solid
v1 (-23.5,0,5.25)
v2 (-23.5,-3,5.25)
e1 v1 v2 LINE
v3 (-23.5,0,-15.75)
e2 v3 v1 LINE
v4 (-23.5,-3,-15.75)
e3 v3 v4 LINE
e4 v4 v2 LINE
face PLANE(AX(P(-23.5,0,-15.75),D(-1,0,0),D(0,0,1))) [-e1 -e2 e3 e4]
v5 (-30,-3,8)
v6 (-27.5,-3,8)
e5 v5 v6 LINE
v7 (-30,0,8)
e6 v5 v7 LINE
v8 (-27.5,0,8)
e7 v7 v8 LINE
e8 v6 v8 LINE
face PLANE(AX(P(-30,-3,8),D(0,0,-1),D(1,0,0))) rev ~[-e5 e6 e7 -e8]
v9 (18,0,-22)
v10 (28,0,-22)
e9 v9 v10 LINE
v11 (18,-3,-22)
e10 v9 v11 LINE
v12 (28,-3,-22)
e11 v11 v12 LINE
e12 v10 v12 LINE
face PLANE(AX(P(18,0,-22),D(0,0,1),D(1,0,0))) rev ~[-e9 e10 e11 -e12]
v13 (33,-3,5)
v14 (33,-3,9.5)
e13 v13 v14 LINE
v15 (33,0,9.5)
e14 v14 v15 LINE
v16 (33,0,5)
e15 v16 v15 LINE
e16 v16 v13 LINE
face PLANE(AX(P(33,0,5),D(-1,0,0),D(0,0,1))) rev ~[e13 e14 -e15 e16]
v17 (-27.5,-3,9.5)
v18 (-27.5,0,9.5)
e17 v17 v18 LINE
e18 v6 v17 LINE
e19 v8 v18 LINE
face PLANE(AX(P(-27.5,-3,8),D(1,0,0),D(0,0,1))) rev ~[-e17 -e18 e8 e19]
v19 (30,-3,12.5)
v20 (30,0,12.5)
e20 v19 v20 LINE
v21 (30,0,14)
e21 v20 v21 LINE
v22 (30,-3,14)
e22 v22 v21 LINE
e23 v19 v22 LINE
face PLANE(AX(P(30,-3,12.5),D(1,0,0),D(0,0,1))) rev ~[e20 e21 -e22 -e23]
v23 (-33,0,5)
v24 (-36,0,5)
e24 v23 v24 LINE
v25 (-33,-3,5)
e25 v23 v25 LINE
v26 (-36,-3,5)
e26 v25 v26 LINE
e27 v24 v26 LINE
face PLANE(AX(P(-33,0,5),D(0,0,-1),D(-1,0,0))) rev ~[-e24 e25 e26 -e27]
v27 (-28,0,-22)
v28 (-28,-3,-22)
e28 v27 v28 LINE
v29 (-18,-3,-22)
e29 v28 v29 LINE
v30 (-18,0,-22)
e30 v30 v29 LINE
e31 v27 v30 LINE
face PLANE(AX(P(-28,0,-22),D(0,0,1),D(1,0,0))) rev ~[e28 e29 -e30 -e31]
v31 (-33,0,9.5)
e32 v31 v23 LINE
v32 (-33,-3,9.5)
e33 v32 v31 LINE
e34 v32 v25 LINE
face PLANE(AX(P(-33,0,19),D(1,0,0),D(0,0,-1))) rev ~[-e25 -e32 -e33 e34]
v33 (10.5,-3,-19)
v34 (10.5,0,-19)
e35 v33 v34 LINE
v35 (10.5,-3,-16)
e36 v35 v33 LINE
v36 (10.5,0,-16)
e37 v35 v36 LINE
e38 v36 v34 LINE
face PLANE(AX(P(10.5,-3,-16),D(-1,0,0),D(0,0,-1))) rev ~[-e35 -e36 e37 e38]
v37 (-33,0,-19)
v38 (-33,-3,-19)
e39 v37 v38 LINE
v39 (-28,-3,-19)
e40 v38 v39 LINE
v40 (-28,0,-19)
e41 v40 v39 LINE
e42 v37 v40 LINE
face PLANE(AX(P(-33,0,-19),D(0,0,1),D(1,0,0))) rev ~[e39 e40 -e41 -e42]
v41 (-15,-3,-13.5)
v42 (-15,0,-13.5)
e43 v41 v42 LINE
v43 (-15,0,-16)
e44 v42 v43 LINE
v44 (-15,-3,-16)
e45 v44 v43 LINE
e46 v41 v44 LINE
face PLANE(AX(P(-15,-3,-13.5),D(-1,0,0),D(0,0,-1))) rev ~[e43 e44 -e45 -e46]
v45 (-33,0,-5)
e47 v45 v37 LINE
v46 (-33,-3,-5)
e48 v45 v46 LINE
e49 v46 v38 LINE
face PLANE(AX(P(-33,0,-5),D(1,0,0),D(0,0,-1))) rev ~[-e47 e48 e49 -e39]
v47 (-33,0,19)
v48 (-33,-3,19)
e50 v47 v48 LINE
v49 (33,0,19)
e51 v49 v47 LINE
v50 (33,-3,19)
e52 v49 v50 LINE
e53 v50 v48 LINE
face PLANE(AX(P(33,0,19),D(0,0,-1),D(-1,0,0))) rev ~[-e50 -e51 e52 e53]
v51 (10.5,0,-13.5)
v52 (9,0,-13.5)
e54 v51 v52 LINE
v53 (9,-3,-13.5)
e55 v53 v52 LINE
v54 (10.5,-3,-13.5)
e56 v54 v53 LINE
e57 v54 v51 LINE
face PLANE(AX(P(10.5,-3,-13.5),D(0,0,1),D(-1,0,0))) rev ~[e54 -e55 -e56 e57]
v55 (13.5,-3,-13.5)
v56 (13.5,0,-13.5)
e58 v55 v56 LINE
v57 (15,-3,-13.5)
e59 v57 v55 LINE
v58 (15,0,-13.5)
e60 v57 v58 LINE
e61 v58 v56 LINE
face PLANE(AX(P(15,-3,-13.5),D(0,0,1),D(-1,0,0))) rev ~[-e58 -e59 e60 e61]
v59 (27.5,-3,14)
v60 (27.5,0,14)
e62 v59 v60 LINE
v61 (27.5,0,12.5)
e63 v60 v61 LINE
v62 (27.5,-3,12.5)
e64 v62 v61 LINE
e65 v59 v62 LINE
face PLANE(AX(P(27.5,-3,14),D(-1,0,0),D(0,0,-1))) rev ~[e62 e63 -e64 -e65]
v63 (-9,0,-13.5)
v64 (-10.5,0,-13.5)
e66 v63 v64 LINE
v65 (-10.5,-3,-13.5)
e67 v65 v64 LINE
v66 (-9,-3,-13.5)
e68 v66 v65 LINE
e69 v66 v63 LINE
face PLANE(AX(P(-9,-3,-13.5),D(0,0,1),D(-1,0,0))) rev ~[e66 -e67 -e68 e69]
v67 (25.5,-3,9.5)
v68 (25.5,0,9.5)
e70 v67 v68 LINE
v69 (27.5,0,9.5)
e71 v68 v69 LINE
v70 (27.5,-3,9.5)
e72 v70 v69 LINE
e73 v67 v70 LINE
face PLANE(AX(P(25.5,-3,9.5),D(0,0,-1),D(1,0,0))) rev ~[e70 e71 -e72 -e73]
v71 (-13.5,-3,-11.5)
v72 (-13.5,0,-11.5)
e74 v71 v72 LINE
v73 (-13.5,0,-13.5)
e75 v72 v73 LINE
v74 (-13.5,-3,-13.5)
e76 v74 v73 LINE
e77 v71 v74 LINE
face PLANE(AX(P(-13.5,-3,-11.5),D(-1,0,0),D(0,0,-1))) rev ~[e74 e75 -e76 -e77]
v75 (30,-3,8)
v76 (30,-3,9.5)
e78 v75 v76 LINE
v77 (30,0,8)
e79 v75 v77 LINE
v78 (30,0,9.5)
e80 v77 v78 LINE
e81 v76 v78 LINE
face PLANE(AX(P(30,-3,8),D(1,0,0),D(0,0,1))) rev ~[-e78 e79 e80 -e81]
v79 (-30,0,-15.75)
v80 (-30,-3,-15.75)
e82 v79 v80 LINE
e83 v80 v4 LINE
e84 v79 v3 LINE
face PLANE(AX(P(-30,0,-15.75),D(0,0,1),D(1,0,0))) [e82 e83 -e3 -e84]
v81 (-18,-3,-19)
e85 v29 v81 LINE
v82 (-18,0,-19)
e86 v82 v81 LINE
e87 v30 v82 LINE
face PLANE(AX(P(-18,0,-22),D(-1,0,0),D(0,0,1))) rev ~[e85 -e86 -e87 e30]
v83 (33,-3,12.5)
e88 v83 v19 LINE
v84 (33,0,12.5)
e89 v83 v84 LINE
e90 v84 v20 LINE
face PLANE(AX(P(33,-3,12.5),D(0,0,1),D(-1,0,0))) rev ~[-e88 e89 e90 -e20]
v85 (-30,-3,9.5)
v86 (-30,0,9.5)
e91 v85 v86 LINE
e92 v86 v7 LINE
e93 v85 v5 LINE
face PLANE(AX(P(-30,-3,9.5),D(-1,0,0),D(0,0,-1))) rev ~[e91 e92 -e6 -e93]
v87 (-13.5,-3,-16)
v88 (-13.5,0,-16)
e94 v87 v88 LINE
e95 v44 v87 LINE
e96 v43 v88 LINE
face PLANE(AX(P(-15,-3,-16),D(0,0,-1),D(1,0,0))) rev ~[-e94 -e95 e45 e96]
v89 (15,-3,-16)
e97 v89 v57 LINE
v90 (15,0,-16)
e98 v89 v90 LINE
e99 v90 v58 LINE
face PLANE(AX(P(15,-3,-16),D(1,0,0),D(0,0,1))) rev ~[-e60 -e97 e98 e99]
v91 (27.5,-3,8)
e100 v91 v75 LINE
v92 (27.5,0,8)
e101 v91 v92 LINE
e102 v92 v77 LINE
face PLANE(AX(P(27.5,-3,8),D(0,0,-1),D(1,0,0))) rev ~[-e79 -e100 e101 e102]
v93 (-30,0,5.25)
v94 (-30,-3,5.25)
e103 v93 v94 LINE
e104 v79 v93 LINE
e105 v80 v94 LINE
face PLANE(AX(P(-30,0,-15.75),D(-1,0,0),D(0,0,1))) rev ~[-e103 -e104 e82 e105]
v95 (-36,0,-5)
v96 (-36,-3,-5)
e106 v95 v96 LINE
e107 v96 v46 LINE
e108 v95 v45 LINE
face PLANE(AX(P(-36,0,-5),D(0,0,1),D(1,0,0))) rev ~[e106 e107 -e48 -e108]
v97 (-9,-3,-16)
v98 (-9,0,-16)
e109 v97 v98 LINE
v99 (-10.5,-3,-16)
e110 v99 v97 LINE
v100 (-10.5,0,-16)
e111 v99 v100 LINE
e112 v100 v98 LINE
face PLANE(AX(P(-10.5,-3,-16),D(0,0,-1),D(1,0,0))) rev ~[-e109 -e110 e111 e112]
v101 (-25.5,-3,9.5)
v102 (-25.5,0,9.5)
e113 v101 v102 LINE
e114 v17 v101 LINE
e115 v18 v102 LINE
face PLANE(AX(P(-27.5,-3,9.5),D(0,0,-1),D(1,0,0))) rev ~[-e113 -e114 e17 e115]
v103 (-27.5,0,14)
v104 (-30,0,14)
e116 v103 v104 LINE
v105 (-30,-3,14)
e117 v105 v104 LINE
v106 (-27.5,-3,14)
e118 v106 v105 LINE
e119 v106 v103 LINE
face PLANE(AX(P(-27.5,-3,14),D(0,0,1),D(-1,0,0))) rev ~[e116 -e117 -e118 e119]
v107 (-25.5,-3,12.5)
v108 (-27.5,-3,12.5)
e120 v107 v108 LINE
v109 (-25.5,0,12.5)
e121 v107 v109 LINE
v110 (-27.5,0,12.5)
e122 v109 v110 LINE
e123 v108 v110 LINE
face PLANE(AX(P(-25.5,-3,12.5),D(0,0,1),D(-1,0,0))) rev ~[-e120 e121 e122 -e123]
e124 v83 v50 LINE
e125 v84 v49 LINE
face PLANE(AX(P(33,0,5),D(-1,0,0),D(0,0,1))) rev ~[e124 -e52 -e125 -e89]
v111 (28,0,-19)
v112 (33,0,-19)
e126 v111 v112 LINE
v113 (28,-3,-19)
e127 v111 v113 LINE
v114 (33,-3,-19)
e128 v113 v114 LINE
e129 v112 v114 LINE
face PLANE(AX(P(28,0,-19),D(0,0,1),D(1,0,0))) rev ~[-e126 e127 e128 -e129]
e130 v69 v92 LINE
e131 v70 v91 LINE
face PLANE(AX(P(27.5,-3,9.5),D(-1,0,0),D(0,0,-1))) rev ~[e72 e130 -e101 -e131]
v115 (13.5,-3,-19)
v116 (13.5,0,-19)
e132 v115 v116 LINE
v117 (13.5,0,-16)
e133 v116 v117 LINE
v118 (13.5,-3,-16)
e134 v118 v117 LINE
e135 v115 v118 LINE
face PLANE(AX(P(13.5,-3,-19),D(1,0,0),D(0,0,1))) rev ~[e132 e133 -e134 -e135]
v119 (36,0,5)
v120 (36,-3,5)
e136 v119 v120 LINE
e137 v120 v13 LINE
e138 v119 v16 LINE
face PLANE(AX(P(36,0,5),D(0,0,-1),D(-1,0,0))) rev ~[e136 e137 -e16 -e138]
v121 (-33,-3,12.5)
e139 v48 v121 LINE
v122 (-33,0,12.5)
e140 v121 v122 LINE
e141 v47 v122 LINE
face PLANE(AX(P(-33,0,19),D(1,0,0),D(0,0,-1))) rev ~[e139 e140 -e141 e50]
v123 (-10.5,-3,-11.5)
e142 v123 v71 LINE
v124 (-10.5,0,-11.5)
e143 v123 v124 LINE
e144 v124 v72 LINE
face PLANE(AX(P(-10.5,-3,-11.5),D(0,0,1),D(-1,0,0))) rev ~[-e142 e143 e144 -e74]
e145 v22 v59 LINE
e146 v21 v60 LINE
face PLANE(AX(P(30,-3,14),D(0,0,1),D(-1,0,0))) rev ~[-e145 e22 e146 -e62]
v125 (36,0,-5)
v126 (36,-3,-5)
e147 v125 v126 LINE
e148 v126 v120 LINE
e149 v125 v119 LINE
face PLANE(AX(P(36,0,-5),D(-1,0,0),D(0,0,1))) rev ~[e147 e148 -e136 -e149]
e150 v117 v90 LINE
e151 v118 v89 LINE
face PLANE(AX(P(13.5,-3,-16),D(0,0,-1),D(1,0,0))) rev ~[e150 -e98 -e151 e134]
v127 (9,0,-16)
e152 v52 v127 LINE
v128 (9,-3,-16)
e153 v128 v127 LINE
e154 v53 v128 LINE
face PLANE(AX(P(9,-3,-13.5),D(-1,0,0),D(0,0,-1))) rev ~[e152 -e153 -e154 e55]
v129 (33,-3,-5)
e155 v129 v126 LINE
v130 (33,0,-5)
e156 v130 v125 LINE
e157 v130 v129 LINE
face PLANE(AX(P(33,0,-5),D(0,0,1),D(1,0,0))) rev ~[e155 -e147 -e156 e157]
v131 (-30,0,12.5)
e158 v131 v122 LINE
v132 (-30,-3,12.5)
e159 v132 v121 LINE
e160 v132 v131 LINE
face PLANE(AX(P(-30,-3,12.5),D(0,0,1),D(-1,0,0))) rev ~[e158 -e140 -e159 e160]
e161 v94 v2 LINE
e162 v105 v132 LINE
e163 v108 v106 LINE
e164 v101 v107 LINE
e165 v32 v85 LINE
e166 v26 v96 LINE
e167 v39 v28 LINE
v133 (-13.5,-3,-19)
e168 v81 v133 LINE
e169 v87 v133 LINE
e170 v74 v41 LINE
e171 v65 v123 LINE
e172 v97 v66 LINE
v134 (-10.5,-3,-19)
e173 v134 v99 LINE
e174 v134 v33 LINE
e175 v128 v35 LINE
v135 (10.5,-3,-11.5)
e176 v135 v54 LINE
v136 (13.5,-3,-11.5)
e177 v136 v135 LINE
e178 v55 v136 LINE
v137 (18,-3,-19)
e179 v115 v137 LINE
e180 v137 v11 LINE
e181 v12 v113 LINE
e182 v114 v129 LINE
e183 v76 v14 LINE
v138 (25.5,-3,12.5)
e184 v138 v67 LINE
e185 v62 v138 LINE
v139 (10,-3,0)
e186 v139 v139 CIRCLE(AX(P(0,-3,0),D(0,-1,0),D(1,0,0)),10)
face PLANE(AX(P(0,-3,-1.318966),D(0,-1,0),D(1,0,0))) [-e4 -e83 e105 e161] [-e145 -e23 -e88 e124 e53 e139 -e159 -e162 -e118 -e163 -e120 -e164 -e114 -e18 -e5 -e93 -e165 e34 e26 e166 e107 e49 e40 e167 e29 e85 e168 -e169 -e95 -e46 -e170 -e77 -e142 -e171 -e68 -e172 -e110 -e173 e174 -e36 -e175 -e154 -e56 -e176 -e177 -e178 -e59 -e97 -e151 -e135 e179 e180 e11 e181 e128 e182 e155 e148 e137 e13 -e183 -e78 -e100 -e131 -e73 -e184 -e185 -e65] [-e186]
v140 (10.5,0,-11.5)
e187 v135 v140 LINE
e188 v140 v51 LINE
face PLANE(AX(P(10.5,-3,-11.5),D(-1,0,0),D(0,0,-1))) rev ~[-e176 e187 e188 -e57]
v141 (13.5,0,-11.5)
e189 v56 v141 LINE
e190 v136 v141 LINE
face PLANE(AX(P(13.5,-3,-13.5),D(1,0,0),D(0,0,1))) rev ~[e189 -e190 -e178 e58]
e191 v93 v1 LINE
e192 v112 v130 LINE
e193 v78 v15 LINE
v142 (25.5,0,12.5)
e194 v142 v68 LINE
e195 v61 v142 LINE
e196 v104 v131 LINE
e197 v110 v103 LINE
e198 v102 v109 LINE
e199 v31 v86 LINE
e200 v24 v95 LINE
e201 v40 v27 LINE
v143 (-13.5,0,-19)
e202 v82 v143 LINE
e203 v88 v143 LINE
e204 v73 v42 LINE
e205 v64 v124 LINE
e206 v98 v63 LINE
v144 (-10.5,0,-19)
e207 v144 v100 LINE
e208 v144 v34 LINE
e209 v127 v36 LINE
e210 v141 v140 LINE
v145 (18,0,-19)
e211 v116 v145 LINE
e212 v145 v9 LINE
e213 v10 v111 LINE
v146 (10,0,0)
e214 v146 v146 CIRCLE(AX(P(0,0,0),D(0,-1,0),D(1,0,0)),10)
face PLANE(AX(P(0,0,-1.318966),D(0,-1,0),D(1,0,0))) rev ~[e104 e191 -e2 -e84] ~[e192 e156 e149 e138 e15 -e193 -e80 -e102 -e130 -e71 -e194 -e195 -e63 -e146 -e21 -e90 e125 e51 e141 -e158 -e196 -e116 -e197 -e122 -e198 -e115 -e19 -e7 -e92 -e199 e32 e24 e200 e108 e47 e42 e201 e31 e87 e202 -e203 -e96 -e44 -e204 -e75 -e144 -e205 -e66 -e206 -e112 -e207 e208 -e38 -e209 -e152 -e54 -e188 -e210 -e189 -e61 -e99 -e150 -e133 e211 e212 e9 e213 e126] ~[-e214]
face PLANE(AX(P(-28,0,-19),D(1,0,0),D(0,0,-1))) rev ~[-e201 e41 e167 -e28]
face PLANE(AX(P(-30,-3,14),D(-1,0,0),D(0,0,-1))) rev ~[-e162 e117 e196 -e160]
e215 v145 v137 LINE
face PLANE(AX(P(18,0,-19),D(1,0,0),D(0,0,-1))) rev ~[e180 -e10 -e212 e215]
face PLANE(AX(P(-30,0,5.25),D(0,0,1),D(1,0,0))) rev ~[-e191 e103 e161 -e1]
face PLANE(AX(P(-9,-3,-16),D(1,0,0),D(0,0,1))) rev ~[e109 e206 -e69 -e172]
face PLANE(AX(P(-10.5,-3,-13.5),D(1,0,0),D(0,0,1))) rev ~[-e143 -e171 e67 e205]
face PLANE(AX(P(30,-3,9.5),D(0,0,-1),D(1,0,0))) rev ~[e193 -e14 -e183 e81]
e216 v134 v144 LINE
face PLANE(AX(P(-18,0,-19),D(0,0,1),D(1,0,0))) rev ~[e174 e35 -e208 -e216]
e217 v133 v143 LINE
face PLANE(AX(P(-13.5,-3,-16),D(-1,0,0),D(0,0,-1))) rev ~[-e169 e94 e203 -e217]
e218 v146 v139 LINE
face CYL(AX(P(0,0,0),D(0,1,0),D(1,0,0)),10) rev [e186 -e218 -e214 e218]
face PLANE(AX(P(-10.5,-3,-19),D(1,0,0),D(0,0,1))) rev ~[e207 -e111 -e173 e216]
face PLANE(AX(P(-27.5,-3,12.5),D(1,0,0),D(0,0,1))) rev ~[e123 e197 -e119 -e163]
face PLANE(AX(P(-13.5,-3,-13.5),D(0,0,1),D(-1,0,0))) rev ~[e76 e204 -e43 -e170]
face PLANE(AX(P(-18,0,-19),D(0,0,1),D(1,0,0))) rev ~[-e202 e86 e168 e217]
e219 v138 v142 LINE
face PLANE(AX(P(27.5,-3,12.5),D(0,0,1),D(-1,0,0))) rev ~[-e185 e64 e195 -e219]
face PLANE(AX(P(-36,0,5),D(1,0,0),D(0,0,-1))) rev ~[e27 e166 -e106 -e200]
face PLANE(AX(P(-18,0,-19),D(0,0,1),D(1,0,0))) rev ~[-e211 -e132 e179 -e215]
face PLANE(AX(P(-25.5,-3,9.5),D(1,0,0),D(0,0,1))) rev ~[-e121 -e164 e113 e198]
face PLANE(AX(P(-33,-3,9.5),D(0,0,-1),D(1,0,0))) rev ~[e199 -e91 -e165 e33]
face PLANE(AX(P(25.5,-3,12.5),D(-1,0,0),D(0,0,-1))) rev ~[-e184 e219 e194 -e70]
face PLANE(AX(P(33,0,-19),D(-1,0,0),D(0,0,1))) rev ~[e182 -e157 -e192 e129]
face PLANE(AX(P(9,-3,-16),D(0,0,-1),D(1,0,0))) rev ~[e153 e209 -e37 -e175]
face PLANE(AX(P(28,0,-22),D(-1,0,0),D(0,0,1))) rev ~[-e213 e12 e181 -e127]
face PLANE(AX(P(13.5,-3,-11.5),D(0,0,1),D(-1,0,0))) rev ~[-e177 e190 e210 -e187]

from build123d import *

# Parameters (mm, degrees)
F0_W     = 6.5
F0_H     = 21
F0_R     = 10
F1_DEPTH = 3
F3_DEPTH = 3


# Not quite as in the source:
# - a feature names something its author has since deleted; it is built from what else it names


with BuildPart() as f1:
    # F0 (on Front) → F1 (new body)
    with BuildSketch(Plane.XZ):
        Polygon((33, 5), (33, 19), (-33, 19), (-33, 5), (-36, 5), (-36, -5), (-33, -5), (-33, -19), (-28, -19), (-28, -22), (-18, -22), (-18, -19), (0, -19), (18, -19), (18, -22), (28, -22), (28, -19), (33, -19), (33, -5), (36, -5), (36, 5), align=None)
        with Locations((-26.75, -5.25)):
            Rectangle(F0_W, F0_H, mode=Mode.SUBTRACT)
        Circle(F0_R, mode=Mode.SUBTRACT)
    extrude(amount=F1_DEPTH)

    # F2 (on face) → F3 (cut, through all)
    with BuildSketch(Plane.XZ.offset(3)):
        Polygon((10.5, -16), (10.5, -19), (13.5, -19), (13.5, -16), (15, -16), (15, -13.5), (13.5, -13.5), (13.5, -11.5), (10.5, -11.5), (10.5, -13.5), (9, -13.5), (9, -16), align=None)
        Polygon((30, 9.5), (33, 9.5), (33, 12.5), (30, 12.5), (30, 14), (27.5, 14), (27.5, 12.5), (25.5, 12.5), (25.5, 9.5), (27.5, 9.5), (27.5, 8), (30, 8), align=None)
        Polygon((-33, 12.5), (-33, 9.5), (-30, 9.5), (-30, 8), (-27.5, 8), (-27.5, 9.5), (-25.5, 9.5), (-25.5, 12.5), (-27.5, 12.5), (-27.5, 14), (-30, 14), (-30, 12.5), align=None)
        Polygon((-13.5, -19), (-10.5, -19), (-10.5, -16), (-9, -16), (-9, -13.5), (-10.5, -13.5), (-10.5, -11.5), (-13.5, -11.5), (-13.5, -13.5), (-15, -13.5), (-15, -16), (-13.5, -16), align=None)
    extrude(amount=-F3_DEPTH, mode=Mode.SUBTRACT)


solid = f1.part
